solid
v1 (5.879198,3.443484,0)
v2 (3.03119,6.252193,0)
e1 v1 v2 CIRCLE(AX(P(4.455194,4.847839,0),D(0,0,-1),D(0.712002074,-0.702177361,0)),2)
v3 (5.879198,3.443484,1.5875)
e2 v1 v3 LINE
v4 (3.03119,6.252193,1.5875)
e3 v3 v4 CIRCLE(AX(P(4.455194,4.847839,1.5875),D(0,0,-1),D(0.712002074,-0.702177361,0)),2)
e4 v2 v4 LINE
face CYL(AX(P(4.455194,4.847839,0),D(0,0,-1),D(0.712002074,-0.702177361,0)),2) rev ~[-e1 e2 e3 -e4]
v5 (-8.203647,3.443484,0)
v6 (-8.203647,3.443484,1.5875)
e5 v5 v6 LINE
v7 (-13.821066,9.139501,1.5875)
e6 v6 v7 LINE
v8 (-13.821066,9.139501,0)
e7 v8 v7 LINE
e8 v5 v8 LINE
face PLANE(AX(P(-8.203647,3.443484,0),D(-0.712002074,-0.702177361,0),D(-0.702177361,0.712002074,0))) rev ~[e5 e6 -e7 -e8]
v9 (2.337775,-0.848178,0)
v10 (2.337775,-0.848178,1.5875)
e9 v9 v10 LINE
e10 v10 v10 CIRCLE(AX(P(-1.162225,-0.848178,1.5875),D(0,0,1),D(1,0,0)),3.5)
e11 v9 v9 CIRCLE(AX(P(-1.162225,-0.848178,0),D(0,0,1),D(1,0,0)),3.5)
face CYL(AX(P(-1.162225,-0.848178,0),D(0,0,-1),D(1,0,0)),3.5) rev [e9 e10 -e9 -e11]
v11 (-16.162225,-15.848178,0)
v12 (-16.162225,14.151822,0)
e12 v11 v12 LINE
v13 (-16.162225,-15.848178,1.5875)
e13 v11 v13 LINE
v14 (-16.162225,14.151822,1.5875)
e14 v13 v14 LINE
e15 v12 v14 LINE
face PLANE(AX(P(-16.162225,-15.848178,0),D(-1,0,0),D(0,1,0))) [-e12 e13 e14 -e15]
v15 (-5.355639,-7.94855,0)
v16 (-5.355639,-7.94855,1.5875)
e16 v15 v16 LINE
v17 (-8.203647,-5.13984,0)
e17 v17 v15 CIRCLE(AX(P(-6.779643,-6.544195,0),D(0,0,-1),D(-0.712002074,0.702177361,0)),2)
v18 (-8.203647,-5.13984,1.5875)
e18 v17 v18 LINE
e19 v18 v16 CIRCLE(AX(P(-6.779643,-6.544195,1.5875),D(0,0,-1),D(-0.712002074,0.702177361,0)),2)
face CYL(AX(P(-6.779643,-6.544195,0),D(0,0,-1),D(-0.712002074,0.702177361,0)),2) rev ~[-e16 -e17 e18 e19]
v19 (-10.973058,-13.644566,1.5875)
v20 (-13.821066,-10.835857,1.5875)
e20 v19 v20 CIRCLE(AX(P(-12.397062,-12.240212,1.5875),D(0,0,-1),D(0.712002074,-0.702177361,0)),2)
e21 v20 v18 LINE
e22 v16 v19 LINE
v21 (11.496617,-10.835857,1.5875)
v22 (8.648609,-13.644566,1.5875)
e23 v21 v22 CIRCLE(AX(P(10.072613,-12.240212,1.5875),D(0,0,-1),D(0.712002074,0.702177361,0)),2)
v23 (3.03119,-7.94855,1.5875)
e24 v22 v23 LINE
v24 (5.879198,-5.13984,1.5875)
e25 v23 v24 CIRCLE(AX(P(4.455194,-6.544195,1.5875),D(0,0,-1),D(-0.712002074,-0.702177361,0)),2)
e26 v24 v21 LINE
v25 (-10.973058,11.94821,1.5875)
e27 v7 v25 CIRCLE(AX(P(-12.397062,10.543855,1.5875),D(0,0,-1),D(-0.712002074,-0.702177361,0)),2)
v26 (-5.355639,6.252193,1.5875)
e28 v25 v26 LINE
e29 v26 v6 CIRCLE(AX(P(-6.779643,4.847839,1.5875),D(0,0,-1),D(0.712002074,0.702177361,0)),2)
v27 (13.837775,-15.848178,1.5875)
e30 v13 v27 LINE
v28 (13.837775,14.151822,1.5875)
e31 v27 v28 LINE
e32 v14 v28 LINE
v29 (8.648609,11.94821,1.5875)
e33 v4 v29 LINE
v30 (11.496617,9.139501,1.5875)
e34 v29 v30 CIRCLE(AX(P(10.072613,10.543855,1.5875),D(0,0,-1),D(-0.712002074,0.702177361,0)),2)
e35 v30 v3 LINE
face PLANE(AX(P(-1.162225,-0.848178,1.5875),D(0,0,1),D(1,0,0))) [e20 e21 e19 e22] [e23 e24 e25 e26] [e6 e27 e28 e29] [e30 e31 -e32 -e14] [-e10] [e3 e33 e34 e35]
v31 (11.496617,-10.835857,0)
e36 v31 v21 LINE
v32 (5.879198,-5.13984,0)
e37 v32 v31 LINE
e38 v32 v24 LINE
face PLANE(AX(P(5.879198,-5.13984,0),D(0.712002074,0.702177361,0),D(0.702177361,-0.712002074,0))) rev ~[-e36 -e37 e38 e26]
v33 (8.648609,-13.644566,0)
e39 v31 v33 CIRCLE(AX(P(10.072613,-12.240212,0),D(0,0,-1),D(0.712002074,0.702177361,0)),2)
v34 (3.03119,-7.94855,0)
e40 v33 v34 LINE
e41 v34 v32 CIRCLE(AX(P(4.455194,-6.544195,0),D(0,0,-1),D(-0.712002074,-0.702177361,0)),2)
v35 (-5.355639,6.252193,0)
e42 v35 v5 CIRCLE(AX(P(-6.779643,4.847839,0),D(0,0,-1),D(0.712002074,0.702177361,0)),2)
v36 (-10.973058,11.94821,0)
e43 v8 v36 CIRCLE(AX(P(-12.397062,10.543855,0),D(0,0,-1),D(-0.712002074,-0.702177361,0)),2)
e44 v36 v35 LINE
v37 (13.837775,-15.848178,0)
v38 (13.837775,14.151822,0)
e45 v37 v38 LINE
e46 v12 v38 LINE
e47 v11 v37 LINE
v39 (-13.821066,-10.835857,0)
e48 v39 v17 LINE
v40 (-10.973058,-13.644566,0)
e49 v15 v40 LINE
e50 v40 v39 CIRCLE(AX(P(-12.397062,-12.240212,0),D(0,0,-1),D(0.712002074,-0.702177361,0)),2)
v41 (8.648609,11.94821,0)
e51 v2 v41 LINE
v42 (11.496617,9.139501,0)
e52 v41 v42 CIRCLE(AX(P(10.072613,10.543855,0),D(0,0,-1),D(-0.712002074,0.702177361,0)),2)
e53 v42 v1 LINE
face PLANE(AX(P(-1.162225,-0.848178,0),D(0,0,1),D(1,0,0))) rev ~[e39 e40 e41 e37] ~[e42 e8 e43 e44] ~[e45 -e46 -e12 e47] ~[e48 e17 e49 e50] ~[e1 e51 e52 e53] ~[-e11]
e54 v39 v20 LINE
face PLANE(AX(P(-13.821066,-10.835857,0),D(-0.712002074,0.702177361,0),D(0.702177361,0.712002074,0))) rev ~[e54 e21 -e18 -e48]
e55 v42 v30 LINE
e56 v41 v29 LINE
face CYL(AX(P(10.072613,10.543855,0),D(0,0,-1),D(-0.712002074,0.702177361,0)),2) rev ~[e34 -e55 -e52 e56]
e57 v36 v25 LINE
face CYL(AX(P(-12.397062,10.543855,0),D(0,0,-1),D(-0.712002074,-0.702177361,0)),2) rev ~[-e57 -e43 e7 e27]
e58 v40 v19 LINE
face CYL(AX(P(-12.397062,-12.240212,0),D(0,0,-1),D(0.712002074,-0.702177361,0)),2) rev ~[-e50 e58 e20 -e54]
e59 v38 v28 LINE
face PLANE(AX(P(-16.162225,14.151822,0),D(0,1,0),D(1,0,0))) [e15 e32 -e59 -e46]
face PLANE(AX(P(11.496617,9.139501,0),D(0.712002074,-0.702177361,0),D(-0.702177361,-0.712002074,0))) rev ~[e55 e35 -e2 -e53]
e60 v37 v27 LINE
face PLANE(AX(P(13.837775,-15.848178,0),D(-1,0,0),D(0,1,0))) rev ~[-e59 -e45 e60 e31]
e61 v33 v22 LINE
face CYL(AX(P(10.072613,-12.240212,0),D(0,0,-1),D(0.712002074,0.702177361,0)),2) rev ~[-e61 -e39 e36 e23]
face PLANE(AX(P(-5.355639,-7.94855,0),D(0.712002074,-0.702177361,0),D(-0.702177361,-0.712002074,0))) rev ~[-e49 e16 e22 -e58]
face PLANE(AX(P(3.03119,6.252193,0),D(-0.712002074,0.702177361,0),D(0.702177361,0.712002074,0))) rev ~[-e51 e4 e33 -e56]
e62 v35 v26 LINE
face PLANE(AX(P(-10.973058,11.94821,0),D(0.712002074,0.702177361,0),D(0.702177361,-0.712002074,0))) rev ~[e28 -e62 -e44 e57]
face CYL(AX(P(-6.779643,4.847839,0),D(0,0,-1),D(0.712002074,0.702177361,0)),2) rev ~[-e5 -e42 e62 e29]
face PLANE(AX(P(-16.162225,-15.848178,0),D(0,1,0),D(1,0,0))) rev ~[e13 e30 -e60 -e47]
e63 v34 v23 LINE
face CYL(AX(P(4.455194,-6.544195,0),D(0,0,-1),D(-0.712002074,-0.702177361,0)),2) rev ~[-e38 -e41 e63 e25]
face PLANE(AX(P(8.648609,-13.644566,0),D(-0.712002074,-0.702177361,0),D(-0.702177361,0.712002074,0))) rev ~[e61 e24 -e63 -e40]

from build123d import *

# Parameters (mm, degrees)
F0_W     = 30
F0_H     = 30
F0_R     = 3.5
F1_DEPTH = 1.5875


# Not quite as in the source:
# - a length typed as a fraction of an inch, garbled in the dataset ("3 / 203.2 mm" for 3/8 in), is restored


with BuildPart() as f1:
    # F0 (on Top) → F1 (new body)
    with BuildSketch(Plane.XY):
        with Locations((-1.1622245609, -0.8481781135)):
            Rectangle(F0_W, F0_H)
        with BuildLine():
            Line((-13.8210662203, -10.8358568401), (-8.2036473316, -5.1398402471))
            ThreePointArc((-8.2036473316, -5.1398402471), (-5.3752884611, -5.120190821), (-5.355639035, -7.9485496914))
            Line((-5.355639035, -7.9485496914), (-10.9730579238, -13.6445662845))
            ThreePointArc((-10.9730579238, -13.6445662845), (-13.8014167942, -13.6642157105), (-13.8210662203, -10.8358568401))
        make_face(mode=Mode.SUBTRACT)
        with BuildLine():
            ThreePointArc((3.0311899132, -7.9485496914), (3.0508393392, -5.120190821), (5.8791982097, -5.1398402471))
            Line((5.8791982097, -5.1398402471), (11.4966170985, -10.8358568401))
            ThreePointArc((11.4966170985, -10.8358568401), (11.4769676724, -13.6642157105), (8.6486088019, -13.6445662845))
            Line((8.6486088019, -13.6445662845), (3.0311899132, -7.9485496914))
        make_face(mode=Mode.SUBTRACT)
        with Locations((-1.1622245609, -0.8481781135)):
            Circle(F0_R, mode=Mode.SUBTRACT)
        with BuildLine():
            ThreePointArc((-5.355639035, 6.2521934645), (-5.3752884611, 3.423834594), (-8.2036473316, 3.4434840201))
            Line((-8.2036473316, 3.4434840201), (-13.8210662203, 9.1395006131))
            ThreePointArc((-13.8210662203, 9.1395006131), (-13.8014167942, 11.9678594836), (-10.9730579238, 11.9482100575))
            Line((-10.9730579238, 11.9482100575), (-5.355639035, 6.2521934645))
        make_face(mode=Mode.SUBTRACT)
        with BuildLine():
            Line((3.0311899132, 6.2521934645), (8.6486088019, 11.9482100575))
            ThreePointArc((8.6486088019, 11.9482100575), (11.4769676724, 11.9678594836), (11.4966170985, 9.1395006131))
            Line((11.4966170985, 9.1395006131), (5.8791982097, 3.4434840201))
            ThreePointArc((5.8791982097, 3.4434840201), (3.0508393392, 3.423834594), (3.0311899132, 6.2521934645))
        make_face(mode=Mode.SUBTRACT)
    extrude(amount=F1_DEPTH)


solid = f1.part
